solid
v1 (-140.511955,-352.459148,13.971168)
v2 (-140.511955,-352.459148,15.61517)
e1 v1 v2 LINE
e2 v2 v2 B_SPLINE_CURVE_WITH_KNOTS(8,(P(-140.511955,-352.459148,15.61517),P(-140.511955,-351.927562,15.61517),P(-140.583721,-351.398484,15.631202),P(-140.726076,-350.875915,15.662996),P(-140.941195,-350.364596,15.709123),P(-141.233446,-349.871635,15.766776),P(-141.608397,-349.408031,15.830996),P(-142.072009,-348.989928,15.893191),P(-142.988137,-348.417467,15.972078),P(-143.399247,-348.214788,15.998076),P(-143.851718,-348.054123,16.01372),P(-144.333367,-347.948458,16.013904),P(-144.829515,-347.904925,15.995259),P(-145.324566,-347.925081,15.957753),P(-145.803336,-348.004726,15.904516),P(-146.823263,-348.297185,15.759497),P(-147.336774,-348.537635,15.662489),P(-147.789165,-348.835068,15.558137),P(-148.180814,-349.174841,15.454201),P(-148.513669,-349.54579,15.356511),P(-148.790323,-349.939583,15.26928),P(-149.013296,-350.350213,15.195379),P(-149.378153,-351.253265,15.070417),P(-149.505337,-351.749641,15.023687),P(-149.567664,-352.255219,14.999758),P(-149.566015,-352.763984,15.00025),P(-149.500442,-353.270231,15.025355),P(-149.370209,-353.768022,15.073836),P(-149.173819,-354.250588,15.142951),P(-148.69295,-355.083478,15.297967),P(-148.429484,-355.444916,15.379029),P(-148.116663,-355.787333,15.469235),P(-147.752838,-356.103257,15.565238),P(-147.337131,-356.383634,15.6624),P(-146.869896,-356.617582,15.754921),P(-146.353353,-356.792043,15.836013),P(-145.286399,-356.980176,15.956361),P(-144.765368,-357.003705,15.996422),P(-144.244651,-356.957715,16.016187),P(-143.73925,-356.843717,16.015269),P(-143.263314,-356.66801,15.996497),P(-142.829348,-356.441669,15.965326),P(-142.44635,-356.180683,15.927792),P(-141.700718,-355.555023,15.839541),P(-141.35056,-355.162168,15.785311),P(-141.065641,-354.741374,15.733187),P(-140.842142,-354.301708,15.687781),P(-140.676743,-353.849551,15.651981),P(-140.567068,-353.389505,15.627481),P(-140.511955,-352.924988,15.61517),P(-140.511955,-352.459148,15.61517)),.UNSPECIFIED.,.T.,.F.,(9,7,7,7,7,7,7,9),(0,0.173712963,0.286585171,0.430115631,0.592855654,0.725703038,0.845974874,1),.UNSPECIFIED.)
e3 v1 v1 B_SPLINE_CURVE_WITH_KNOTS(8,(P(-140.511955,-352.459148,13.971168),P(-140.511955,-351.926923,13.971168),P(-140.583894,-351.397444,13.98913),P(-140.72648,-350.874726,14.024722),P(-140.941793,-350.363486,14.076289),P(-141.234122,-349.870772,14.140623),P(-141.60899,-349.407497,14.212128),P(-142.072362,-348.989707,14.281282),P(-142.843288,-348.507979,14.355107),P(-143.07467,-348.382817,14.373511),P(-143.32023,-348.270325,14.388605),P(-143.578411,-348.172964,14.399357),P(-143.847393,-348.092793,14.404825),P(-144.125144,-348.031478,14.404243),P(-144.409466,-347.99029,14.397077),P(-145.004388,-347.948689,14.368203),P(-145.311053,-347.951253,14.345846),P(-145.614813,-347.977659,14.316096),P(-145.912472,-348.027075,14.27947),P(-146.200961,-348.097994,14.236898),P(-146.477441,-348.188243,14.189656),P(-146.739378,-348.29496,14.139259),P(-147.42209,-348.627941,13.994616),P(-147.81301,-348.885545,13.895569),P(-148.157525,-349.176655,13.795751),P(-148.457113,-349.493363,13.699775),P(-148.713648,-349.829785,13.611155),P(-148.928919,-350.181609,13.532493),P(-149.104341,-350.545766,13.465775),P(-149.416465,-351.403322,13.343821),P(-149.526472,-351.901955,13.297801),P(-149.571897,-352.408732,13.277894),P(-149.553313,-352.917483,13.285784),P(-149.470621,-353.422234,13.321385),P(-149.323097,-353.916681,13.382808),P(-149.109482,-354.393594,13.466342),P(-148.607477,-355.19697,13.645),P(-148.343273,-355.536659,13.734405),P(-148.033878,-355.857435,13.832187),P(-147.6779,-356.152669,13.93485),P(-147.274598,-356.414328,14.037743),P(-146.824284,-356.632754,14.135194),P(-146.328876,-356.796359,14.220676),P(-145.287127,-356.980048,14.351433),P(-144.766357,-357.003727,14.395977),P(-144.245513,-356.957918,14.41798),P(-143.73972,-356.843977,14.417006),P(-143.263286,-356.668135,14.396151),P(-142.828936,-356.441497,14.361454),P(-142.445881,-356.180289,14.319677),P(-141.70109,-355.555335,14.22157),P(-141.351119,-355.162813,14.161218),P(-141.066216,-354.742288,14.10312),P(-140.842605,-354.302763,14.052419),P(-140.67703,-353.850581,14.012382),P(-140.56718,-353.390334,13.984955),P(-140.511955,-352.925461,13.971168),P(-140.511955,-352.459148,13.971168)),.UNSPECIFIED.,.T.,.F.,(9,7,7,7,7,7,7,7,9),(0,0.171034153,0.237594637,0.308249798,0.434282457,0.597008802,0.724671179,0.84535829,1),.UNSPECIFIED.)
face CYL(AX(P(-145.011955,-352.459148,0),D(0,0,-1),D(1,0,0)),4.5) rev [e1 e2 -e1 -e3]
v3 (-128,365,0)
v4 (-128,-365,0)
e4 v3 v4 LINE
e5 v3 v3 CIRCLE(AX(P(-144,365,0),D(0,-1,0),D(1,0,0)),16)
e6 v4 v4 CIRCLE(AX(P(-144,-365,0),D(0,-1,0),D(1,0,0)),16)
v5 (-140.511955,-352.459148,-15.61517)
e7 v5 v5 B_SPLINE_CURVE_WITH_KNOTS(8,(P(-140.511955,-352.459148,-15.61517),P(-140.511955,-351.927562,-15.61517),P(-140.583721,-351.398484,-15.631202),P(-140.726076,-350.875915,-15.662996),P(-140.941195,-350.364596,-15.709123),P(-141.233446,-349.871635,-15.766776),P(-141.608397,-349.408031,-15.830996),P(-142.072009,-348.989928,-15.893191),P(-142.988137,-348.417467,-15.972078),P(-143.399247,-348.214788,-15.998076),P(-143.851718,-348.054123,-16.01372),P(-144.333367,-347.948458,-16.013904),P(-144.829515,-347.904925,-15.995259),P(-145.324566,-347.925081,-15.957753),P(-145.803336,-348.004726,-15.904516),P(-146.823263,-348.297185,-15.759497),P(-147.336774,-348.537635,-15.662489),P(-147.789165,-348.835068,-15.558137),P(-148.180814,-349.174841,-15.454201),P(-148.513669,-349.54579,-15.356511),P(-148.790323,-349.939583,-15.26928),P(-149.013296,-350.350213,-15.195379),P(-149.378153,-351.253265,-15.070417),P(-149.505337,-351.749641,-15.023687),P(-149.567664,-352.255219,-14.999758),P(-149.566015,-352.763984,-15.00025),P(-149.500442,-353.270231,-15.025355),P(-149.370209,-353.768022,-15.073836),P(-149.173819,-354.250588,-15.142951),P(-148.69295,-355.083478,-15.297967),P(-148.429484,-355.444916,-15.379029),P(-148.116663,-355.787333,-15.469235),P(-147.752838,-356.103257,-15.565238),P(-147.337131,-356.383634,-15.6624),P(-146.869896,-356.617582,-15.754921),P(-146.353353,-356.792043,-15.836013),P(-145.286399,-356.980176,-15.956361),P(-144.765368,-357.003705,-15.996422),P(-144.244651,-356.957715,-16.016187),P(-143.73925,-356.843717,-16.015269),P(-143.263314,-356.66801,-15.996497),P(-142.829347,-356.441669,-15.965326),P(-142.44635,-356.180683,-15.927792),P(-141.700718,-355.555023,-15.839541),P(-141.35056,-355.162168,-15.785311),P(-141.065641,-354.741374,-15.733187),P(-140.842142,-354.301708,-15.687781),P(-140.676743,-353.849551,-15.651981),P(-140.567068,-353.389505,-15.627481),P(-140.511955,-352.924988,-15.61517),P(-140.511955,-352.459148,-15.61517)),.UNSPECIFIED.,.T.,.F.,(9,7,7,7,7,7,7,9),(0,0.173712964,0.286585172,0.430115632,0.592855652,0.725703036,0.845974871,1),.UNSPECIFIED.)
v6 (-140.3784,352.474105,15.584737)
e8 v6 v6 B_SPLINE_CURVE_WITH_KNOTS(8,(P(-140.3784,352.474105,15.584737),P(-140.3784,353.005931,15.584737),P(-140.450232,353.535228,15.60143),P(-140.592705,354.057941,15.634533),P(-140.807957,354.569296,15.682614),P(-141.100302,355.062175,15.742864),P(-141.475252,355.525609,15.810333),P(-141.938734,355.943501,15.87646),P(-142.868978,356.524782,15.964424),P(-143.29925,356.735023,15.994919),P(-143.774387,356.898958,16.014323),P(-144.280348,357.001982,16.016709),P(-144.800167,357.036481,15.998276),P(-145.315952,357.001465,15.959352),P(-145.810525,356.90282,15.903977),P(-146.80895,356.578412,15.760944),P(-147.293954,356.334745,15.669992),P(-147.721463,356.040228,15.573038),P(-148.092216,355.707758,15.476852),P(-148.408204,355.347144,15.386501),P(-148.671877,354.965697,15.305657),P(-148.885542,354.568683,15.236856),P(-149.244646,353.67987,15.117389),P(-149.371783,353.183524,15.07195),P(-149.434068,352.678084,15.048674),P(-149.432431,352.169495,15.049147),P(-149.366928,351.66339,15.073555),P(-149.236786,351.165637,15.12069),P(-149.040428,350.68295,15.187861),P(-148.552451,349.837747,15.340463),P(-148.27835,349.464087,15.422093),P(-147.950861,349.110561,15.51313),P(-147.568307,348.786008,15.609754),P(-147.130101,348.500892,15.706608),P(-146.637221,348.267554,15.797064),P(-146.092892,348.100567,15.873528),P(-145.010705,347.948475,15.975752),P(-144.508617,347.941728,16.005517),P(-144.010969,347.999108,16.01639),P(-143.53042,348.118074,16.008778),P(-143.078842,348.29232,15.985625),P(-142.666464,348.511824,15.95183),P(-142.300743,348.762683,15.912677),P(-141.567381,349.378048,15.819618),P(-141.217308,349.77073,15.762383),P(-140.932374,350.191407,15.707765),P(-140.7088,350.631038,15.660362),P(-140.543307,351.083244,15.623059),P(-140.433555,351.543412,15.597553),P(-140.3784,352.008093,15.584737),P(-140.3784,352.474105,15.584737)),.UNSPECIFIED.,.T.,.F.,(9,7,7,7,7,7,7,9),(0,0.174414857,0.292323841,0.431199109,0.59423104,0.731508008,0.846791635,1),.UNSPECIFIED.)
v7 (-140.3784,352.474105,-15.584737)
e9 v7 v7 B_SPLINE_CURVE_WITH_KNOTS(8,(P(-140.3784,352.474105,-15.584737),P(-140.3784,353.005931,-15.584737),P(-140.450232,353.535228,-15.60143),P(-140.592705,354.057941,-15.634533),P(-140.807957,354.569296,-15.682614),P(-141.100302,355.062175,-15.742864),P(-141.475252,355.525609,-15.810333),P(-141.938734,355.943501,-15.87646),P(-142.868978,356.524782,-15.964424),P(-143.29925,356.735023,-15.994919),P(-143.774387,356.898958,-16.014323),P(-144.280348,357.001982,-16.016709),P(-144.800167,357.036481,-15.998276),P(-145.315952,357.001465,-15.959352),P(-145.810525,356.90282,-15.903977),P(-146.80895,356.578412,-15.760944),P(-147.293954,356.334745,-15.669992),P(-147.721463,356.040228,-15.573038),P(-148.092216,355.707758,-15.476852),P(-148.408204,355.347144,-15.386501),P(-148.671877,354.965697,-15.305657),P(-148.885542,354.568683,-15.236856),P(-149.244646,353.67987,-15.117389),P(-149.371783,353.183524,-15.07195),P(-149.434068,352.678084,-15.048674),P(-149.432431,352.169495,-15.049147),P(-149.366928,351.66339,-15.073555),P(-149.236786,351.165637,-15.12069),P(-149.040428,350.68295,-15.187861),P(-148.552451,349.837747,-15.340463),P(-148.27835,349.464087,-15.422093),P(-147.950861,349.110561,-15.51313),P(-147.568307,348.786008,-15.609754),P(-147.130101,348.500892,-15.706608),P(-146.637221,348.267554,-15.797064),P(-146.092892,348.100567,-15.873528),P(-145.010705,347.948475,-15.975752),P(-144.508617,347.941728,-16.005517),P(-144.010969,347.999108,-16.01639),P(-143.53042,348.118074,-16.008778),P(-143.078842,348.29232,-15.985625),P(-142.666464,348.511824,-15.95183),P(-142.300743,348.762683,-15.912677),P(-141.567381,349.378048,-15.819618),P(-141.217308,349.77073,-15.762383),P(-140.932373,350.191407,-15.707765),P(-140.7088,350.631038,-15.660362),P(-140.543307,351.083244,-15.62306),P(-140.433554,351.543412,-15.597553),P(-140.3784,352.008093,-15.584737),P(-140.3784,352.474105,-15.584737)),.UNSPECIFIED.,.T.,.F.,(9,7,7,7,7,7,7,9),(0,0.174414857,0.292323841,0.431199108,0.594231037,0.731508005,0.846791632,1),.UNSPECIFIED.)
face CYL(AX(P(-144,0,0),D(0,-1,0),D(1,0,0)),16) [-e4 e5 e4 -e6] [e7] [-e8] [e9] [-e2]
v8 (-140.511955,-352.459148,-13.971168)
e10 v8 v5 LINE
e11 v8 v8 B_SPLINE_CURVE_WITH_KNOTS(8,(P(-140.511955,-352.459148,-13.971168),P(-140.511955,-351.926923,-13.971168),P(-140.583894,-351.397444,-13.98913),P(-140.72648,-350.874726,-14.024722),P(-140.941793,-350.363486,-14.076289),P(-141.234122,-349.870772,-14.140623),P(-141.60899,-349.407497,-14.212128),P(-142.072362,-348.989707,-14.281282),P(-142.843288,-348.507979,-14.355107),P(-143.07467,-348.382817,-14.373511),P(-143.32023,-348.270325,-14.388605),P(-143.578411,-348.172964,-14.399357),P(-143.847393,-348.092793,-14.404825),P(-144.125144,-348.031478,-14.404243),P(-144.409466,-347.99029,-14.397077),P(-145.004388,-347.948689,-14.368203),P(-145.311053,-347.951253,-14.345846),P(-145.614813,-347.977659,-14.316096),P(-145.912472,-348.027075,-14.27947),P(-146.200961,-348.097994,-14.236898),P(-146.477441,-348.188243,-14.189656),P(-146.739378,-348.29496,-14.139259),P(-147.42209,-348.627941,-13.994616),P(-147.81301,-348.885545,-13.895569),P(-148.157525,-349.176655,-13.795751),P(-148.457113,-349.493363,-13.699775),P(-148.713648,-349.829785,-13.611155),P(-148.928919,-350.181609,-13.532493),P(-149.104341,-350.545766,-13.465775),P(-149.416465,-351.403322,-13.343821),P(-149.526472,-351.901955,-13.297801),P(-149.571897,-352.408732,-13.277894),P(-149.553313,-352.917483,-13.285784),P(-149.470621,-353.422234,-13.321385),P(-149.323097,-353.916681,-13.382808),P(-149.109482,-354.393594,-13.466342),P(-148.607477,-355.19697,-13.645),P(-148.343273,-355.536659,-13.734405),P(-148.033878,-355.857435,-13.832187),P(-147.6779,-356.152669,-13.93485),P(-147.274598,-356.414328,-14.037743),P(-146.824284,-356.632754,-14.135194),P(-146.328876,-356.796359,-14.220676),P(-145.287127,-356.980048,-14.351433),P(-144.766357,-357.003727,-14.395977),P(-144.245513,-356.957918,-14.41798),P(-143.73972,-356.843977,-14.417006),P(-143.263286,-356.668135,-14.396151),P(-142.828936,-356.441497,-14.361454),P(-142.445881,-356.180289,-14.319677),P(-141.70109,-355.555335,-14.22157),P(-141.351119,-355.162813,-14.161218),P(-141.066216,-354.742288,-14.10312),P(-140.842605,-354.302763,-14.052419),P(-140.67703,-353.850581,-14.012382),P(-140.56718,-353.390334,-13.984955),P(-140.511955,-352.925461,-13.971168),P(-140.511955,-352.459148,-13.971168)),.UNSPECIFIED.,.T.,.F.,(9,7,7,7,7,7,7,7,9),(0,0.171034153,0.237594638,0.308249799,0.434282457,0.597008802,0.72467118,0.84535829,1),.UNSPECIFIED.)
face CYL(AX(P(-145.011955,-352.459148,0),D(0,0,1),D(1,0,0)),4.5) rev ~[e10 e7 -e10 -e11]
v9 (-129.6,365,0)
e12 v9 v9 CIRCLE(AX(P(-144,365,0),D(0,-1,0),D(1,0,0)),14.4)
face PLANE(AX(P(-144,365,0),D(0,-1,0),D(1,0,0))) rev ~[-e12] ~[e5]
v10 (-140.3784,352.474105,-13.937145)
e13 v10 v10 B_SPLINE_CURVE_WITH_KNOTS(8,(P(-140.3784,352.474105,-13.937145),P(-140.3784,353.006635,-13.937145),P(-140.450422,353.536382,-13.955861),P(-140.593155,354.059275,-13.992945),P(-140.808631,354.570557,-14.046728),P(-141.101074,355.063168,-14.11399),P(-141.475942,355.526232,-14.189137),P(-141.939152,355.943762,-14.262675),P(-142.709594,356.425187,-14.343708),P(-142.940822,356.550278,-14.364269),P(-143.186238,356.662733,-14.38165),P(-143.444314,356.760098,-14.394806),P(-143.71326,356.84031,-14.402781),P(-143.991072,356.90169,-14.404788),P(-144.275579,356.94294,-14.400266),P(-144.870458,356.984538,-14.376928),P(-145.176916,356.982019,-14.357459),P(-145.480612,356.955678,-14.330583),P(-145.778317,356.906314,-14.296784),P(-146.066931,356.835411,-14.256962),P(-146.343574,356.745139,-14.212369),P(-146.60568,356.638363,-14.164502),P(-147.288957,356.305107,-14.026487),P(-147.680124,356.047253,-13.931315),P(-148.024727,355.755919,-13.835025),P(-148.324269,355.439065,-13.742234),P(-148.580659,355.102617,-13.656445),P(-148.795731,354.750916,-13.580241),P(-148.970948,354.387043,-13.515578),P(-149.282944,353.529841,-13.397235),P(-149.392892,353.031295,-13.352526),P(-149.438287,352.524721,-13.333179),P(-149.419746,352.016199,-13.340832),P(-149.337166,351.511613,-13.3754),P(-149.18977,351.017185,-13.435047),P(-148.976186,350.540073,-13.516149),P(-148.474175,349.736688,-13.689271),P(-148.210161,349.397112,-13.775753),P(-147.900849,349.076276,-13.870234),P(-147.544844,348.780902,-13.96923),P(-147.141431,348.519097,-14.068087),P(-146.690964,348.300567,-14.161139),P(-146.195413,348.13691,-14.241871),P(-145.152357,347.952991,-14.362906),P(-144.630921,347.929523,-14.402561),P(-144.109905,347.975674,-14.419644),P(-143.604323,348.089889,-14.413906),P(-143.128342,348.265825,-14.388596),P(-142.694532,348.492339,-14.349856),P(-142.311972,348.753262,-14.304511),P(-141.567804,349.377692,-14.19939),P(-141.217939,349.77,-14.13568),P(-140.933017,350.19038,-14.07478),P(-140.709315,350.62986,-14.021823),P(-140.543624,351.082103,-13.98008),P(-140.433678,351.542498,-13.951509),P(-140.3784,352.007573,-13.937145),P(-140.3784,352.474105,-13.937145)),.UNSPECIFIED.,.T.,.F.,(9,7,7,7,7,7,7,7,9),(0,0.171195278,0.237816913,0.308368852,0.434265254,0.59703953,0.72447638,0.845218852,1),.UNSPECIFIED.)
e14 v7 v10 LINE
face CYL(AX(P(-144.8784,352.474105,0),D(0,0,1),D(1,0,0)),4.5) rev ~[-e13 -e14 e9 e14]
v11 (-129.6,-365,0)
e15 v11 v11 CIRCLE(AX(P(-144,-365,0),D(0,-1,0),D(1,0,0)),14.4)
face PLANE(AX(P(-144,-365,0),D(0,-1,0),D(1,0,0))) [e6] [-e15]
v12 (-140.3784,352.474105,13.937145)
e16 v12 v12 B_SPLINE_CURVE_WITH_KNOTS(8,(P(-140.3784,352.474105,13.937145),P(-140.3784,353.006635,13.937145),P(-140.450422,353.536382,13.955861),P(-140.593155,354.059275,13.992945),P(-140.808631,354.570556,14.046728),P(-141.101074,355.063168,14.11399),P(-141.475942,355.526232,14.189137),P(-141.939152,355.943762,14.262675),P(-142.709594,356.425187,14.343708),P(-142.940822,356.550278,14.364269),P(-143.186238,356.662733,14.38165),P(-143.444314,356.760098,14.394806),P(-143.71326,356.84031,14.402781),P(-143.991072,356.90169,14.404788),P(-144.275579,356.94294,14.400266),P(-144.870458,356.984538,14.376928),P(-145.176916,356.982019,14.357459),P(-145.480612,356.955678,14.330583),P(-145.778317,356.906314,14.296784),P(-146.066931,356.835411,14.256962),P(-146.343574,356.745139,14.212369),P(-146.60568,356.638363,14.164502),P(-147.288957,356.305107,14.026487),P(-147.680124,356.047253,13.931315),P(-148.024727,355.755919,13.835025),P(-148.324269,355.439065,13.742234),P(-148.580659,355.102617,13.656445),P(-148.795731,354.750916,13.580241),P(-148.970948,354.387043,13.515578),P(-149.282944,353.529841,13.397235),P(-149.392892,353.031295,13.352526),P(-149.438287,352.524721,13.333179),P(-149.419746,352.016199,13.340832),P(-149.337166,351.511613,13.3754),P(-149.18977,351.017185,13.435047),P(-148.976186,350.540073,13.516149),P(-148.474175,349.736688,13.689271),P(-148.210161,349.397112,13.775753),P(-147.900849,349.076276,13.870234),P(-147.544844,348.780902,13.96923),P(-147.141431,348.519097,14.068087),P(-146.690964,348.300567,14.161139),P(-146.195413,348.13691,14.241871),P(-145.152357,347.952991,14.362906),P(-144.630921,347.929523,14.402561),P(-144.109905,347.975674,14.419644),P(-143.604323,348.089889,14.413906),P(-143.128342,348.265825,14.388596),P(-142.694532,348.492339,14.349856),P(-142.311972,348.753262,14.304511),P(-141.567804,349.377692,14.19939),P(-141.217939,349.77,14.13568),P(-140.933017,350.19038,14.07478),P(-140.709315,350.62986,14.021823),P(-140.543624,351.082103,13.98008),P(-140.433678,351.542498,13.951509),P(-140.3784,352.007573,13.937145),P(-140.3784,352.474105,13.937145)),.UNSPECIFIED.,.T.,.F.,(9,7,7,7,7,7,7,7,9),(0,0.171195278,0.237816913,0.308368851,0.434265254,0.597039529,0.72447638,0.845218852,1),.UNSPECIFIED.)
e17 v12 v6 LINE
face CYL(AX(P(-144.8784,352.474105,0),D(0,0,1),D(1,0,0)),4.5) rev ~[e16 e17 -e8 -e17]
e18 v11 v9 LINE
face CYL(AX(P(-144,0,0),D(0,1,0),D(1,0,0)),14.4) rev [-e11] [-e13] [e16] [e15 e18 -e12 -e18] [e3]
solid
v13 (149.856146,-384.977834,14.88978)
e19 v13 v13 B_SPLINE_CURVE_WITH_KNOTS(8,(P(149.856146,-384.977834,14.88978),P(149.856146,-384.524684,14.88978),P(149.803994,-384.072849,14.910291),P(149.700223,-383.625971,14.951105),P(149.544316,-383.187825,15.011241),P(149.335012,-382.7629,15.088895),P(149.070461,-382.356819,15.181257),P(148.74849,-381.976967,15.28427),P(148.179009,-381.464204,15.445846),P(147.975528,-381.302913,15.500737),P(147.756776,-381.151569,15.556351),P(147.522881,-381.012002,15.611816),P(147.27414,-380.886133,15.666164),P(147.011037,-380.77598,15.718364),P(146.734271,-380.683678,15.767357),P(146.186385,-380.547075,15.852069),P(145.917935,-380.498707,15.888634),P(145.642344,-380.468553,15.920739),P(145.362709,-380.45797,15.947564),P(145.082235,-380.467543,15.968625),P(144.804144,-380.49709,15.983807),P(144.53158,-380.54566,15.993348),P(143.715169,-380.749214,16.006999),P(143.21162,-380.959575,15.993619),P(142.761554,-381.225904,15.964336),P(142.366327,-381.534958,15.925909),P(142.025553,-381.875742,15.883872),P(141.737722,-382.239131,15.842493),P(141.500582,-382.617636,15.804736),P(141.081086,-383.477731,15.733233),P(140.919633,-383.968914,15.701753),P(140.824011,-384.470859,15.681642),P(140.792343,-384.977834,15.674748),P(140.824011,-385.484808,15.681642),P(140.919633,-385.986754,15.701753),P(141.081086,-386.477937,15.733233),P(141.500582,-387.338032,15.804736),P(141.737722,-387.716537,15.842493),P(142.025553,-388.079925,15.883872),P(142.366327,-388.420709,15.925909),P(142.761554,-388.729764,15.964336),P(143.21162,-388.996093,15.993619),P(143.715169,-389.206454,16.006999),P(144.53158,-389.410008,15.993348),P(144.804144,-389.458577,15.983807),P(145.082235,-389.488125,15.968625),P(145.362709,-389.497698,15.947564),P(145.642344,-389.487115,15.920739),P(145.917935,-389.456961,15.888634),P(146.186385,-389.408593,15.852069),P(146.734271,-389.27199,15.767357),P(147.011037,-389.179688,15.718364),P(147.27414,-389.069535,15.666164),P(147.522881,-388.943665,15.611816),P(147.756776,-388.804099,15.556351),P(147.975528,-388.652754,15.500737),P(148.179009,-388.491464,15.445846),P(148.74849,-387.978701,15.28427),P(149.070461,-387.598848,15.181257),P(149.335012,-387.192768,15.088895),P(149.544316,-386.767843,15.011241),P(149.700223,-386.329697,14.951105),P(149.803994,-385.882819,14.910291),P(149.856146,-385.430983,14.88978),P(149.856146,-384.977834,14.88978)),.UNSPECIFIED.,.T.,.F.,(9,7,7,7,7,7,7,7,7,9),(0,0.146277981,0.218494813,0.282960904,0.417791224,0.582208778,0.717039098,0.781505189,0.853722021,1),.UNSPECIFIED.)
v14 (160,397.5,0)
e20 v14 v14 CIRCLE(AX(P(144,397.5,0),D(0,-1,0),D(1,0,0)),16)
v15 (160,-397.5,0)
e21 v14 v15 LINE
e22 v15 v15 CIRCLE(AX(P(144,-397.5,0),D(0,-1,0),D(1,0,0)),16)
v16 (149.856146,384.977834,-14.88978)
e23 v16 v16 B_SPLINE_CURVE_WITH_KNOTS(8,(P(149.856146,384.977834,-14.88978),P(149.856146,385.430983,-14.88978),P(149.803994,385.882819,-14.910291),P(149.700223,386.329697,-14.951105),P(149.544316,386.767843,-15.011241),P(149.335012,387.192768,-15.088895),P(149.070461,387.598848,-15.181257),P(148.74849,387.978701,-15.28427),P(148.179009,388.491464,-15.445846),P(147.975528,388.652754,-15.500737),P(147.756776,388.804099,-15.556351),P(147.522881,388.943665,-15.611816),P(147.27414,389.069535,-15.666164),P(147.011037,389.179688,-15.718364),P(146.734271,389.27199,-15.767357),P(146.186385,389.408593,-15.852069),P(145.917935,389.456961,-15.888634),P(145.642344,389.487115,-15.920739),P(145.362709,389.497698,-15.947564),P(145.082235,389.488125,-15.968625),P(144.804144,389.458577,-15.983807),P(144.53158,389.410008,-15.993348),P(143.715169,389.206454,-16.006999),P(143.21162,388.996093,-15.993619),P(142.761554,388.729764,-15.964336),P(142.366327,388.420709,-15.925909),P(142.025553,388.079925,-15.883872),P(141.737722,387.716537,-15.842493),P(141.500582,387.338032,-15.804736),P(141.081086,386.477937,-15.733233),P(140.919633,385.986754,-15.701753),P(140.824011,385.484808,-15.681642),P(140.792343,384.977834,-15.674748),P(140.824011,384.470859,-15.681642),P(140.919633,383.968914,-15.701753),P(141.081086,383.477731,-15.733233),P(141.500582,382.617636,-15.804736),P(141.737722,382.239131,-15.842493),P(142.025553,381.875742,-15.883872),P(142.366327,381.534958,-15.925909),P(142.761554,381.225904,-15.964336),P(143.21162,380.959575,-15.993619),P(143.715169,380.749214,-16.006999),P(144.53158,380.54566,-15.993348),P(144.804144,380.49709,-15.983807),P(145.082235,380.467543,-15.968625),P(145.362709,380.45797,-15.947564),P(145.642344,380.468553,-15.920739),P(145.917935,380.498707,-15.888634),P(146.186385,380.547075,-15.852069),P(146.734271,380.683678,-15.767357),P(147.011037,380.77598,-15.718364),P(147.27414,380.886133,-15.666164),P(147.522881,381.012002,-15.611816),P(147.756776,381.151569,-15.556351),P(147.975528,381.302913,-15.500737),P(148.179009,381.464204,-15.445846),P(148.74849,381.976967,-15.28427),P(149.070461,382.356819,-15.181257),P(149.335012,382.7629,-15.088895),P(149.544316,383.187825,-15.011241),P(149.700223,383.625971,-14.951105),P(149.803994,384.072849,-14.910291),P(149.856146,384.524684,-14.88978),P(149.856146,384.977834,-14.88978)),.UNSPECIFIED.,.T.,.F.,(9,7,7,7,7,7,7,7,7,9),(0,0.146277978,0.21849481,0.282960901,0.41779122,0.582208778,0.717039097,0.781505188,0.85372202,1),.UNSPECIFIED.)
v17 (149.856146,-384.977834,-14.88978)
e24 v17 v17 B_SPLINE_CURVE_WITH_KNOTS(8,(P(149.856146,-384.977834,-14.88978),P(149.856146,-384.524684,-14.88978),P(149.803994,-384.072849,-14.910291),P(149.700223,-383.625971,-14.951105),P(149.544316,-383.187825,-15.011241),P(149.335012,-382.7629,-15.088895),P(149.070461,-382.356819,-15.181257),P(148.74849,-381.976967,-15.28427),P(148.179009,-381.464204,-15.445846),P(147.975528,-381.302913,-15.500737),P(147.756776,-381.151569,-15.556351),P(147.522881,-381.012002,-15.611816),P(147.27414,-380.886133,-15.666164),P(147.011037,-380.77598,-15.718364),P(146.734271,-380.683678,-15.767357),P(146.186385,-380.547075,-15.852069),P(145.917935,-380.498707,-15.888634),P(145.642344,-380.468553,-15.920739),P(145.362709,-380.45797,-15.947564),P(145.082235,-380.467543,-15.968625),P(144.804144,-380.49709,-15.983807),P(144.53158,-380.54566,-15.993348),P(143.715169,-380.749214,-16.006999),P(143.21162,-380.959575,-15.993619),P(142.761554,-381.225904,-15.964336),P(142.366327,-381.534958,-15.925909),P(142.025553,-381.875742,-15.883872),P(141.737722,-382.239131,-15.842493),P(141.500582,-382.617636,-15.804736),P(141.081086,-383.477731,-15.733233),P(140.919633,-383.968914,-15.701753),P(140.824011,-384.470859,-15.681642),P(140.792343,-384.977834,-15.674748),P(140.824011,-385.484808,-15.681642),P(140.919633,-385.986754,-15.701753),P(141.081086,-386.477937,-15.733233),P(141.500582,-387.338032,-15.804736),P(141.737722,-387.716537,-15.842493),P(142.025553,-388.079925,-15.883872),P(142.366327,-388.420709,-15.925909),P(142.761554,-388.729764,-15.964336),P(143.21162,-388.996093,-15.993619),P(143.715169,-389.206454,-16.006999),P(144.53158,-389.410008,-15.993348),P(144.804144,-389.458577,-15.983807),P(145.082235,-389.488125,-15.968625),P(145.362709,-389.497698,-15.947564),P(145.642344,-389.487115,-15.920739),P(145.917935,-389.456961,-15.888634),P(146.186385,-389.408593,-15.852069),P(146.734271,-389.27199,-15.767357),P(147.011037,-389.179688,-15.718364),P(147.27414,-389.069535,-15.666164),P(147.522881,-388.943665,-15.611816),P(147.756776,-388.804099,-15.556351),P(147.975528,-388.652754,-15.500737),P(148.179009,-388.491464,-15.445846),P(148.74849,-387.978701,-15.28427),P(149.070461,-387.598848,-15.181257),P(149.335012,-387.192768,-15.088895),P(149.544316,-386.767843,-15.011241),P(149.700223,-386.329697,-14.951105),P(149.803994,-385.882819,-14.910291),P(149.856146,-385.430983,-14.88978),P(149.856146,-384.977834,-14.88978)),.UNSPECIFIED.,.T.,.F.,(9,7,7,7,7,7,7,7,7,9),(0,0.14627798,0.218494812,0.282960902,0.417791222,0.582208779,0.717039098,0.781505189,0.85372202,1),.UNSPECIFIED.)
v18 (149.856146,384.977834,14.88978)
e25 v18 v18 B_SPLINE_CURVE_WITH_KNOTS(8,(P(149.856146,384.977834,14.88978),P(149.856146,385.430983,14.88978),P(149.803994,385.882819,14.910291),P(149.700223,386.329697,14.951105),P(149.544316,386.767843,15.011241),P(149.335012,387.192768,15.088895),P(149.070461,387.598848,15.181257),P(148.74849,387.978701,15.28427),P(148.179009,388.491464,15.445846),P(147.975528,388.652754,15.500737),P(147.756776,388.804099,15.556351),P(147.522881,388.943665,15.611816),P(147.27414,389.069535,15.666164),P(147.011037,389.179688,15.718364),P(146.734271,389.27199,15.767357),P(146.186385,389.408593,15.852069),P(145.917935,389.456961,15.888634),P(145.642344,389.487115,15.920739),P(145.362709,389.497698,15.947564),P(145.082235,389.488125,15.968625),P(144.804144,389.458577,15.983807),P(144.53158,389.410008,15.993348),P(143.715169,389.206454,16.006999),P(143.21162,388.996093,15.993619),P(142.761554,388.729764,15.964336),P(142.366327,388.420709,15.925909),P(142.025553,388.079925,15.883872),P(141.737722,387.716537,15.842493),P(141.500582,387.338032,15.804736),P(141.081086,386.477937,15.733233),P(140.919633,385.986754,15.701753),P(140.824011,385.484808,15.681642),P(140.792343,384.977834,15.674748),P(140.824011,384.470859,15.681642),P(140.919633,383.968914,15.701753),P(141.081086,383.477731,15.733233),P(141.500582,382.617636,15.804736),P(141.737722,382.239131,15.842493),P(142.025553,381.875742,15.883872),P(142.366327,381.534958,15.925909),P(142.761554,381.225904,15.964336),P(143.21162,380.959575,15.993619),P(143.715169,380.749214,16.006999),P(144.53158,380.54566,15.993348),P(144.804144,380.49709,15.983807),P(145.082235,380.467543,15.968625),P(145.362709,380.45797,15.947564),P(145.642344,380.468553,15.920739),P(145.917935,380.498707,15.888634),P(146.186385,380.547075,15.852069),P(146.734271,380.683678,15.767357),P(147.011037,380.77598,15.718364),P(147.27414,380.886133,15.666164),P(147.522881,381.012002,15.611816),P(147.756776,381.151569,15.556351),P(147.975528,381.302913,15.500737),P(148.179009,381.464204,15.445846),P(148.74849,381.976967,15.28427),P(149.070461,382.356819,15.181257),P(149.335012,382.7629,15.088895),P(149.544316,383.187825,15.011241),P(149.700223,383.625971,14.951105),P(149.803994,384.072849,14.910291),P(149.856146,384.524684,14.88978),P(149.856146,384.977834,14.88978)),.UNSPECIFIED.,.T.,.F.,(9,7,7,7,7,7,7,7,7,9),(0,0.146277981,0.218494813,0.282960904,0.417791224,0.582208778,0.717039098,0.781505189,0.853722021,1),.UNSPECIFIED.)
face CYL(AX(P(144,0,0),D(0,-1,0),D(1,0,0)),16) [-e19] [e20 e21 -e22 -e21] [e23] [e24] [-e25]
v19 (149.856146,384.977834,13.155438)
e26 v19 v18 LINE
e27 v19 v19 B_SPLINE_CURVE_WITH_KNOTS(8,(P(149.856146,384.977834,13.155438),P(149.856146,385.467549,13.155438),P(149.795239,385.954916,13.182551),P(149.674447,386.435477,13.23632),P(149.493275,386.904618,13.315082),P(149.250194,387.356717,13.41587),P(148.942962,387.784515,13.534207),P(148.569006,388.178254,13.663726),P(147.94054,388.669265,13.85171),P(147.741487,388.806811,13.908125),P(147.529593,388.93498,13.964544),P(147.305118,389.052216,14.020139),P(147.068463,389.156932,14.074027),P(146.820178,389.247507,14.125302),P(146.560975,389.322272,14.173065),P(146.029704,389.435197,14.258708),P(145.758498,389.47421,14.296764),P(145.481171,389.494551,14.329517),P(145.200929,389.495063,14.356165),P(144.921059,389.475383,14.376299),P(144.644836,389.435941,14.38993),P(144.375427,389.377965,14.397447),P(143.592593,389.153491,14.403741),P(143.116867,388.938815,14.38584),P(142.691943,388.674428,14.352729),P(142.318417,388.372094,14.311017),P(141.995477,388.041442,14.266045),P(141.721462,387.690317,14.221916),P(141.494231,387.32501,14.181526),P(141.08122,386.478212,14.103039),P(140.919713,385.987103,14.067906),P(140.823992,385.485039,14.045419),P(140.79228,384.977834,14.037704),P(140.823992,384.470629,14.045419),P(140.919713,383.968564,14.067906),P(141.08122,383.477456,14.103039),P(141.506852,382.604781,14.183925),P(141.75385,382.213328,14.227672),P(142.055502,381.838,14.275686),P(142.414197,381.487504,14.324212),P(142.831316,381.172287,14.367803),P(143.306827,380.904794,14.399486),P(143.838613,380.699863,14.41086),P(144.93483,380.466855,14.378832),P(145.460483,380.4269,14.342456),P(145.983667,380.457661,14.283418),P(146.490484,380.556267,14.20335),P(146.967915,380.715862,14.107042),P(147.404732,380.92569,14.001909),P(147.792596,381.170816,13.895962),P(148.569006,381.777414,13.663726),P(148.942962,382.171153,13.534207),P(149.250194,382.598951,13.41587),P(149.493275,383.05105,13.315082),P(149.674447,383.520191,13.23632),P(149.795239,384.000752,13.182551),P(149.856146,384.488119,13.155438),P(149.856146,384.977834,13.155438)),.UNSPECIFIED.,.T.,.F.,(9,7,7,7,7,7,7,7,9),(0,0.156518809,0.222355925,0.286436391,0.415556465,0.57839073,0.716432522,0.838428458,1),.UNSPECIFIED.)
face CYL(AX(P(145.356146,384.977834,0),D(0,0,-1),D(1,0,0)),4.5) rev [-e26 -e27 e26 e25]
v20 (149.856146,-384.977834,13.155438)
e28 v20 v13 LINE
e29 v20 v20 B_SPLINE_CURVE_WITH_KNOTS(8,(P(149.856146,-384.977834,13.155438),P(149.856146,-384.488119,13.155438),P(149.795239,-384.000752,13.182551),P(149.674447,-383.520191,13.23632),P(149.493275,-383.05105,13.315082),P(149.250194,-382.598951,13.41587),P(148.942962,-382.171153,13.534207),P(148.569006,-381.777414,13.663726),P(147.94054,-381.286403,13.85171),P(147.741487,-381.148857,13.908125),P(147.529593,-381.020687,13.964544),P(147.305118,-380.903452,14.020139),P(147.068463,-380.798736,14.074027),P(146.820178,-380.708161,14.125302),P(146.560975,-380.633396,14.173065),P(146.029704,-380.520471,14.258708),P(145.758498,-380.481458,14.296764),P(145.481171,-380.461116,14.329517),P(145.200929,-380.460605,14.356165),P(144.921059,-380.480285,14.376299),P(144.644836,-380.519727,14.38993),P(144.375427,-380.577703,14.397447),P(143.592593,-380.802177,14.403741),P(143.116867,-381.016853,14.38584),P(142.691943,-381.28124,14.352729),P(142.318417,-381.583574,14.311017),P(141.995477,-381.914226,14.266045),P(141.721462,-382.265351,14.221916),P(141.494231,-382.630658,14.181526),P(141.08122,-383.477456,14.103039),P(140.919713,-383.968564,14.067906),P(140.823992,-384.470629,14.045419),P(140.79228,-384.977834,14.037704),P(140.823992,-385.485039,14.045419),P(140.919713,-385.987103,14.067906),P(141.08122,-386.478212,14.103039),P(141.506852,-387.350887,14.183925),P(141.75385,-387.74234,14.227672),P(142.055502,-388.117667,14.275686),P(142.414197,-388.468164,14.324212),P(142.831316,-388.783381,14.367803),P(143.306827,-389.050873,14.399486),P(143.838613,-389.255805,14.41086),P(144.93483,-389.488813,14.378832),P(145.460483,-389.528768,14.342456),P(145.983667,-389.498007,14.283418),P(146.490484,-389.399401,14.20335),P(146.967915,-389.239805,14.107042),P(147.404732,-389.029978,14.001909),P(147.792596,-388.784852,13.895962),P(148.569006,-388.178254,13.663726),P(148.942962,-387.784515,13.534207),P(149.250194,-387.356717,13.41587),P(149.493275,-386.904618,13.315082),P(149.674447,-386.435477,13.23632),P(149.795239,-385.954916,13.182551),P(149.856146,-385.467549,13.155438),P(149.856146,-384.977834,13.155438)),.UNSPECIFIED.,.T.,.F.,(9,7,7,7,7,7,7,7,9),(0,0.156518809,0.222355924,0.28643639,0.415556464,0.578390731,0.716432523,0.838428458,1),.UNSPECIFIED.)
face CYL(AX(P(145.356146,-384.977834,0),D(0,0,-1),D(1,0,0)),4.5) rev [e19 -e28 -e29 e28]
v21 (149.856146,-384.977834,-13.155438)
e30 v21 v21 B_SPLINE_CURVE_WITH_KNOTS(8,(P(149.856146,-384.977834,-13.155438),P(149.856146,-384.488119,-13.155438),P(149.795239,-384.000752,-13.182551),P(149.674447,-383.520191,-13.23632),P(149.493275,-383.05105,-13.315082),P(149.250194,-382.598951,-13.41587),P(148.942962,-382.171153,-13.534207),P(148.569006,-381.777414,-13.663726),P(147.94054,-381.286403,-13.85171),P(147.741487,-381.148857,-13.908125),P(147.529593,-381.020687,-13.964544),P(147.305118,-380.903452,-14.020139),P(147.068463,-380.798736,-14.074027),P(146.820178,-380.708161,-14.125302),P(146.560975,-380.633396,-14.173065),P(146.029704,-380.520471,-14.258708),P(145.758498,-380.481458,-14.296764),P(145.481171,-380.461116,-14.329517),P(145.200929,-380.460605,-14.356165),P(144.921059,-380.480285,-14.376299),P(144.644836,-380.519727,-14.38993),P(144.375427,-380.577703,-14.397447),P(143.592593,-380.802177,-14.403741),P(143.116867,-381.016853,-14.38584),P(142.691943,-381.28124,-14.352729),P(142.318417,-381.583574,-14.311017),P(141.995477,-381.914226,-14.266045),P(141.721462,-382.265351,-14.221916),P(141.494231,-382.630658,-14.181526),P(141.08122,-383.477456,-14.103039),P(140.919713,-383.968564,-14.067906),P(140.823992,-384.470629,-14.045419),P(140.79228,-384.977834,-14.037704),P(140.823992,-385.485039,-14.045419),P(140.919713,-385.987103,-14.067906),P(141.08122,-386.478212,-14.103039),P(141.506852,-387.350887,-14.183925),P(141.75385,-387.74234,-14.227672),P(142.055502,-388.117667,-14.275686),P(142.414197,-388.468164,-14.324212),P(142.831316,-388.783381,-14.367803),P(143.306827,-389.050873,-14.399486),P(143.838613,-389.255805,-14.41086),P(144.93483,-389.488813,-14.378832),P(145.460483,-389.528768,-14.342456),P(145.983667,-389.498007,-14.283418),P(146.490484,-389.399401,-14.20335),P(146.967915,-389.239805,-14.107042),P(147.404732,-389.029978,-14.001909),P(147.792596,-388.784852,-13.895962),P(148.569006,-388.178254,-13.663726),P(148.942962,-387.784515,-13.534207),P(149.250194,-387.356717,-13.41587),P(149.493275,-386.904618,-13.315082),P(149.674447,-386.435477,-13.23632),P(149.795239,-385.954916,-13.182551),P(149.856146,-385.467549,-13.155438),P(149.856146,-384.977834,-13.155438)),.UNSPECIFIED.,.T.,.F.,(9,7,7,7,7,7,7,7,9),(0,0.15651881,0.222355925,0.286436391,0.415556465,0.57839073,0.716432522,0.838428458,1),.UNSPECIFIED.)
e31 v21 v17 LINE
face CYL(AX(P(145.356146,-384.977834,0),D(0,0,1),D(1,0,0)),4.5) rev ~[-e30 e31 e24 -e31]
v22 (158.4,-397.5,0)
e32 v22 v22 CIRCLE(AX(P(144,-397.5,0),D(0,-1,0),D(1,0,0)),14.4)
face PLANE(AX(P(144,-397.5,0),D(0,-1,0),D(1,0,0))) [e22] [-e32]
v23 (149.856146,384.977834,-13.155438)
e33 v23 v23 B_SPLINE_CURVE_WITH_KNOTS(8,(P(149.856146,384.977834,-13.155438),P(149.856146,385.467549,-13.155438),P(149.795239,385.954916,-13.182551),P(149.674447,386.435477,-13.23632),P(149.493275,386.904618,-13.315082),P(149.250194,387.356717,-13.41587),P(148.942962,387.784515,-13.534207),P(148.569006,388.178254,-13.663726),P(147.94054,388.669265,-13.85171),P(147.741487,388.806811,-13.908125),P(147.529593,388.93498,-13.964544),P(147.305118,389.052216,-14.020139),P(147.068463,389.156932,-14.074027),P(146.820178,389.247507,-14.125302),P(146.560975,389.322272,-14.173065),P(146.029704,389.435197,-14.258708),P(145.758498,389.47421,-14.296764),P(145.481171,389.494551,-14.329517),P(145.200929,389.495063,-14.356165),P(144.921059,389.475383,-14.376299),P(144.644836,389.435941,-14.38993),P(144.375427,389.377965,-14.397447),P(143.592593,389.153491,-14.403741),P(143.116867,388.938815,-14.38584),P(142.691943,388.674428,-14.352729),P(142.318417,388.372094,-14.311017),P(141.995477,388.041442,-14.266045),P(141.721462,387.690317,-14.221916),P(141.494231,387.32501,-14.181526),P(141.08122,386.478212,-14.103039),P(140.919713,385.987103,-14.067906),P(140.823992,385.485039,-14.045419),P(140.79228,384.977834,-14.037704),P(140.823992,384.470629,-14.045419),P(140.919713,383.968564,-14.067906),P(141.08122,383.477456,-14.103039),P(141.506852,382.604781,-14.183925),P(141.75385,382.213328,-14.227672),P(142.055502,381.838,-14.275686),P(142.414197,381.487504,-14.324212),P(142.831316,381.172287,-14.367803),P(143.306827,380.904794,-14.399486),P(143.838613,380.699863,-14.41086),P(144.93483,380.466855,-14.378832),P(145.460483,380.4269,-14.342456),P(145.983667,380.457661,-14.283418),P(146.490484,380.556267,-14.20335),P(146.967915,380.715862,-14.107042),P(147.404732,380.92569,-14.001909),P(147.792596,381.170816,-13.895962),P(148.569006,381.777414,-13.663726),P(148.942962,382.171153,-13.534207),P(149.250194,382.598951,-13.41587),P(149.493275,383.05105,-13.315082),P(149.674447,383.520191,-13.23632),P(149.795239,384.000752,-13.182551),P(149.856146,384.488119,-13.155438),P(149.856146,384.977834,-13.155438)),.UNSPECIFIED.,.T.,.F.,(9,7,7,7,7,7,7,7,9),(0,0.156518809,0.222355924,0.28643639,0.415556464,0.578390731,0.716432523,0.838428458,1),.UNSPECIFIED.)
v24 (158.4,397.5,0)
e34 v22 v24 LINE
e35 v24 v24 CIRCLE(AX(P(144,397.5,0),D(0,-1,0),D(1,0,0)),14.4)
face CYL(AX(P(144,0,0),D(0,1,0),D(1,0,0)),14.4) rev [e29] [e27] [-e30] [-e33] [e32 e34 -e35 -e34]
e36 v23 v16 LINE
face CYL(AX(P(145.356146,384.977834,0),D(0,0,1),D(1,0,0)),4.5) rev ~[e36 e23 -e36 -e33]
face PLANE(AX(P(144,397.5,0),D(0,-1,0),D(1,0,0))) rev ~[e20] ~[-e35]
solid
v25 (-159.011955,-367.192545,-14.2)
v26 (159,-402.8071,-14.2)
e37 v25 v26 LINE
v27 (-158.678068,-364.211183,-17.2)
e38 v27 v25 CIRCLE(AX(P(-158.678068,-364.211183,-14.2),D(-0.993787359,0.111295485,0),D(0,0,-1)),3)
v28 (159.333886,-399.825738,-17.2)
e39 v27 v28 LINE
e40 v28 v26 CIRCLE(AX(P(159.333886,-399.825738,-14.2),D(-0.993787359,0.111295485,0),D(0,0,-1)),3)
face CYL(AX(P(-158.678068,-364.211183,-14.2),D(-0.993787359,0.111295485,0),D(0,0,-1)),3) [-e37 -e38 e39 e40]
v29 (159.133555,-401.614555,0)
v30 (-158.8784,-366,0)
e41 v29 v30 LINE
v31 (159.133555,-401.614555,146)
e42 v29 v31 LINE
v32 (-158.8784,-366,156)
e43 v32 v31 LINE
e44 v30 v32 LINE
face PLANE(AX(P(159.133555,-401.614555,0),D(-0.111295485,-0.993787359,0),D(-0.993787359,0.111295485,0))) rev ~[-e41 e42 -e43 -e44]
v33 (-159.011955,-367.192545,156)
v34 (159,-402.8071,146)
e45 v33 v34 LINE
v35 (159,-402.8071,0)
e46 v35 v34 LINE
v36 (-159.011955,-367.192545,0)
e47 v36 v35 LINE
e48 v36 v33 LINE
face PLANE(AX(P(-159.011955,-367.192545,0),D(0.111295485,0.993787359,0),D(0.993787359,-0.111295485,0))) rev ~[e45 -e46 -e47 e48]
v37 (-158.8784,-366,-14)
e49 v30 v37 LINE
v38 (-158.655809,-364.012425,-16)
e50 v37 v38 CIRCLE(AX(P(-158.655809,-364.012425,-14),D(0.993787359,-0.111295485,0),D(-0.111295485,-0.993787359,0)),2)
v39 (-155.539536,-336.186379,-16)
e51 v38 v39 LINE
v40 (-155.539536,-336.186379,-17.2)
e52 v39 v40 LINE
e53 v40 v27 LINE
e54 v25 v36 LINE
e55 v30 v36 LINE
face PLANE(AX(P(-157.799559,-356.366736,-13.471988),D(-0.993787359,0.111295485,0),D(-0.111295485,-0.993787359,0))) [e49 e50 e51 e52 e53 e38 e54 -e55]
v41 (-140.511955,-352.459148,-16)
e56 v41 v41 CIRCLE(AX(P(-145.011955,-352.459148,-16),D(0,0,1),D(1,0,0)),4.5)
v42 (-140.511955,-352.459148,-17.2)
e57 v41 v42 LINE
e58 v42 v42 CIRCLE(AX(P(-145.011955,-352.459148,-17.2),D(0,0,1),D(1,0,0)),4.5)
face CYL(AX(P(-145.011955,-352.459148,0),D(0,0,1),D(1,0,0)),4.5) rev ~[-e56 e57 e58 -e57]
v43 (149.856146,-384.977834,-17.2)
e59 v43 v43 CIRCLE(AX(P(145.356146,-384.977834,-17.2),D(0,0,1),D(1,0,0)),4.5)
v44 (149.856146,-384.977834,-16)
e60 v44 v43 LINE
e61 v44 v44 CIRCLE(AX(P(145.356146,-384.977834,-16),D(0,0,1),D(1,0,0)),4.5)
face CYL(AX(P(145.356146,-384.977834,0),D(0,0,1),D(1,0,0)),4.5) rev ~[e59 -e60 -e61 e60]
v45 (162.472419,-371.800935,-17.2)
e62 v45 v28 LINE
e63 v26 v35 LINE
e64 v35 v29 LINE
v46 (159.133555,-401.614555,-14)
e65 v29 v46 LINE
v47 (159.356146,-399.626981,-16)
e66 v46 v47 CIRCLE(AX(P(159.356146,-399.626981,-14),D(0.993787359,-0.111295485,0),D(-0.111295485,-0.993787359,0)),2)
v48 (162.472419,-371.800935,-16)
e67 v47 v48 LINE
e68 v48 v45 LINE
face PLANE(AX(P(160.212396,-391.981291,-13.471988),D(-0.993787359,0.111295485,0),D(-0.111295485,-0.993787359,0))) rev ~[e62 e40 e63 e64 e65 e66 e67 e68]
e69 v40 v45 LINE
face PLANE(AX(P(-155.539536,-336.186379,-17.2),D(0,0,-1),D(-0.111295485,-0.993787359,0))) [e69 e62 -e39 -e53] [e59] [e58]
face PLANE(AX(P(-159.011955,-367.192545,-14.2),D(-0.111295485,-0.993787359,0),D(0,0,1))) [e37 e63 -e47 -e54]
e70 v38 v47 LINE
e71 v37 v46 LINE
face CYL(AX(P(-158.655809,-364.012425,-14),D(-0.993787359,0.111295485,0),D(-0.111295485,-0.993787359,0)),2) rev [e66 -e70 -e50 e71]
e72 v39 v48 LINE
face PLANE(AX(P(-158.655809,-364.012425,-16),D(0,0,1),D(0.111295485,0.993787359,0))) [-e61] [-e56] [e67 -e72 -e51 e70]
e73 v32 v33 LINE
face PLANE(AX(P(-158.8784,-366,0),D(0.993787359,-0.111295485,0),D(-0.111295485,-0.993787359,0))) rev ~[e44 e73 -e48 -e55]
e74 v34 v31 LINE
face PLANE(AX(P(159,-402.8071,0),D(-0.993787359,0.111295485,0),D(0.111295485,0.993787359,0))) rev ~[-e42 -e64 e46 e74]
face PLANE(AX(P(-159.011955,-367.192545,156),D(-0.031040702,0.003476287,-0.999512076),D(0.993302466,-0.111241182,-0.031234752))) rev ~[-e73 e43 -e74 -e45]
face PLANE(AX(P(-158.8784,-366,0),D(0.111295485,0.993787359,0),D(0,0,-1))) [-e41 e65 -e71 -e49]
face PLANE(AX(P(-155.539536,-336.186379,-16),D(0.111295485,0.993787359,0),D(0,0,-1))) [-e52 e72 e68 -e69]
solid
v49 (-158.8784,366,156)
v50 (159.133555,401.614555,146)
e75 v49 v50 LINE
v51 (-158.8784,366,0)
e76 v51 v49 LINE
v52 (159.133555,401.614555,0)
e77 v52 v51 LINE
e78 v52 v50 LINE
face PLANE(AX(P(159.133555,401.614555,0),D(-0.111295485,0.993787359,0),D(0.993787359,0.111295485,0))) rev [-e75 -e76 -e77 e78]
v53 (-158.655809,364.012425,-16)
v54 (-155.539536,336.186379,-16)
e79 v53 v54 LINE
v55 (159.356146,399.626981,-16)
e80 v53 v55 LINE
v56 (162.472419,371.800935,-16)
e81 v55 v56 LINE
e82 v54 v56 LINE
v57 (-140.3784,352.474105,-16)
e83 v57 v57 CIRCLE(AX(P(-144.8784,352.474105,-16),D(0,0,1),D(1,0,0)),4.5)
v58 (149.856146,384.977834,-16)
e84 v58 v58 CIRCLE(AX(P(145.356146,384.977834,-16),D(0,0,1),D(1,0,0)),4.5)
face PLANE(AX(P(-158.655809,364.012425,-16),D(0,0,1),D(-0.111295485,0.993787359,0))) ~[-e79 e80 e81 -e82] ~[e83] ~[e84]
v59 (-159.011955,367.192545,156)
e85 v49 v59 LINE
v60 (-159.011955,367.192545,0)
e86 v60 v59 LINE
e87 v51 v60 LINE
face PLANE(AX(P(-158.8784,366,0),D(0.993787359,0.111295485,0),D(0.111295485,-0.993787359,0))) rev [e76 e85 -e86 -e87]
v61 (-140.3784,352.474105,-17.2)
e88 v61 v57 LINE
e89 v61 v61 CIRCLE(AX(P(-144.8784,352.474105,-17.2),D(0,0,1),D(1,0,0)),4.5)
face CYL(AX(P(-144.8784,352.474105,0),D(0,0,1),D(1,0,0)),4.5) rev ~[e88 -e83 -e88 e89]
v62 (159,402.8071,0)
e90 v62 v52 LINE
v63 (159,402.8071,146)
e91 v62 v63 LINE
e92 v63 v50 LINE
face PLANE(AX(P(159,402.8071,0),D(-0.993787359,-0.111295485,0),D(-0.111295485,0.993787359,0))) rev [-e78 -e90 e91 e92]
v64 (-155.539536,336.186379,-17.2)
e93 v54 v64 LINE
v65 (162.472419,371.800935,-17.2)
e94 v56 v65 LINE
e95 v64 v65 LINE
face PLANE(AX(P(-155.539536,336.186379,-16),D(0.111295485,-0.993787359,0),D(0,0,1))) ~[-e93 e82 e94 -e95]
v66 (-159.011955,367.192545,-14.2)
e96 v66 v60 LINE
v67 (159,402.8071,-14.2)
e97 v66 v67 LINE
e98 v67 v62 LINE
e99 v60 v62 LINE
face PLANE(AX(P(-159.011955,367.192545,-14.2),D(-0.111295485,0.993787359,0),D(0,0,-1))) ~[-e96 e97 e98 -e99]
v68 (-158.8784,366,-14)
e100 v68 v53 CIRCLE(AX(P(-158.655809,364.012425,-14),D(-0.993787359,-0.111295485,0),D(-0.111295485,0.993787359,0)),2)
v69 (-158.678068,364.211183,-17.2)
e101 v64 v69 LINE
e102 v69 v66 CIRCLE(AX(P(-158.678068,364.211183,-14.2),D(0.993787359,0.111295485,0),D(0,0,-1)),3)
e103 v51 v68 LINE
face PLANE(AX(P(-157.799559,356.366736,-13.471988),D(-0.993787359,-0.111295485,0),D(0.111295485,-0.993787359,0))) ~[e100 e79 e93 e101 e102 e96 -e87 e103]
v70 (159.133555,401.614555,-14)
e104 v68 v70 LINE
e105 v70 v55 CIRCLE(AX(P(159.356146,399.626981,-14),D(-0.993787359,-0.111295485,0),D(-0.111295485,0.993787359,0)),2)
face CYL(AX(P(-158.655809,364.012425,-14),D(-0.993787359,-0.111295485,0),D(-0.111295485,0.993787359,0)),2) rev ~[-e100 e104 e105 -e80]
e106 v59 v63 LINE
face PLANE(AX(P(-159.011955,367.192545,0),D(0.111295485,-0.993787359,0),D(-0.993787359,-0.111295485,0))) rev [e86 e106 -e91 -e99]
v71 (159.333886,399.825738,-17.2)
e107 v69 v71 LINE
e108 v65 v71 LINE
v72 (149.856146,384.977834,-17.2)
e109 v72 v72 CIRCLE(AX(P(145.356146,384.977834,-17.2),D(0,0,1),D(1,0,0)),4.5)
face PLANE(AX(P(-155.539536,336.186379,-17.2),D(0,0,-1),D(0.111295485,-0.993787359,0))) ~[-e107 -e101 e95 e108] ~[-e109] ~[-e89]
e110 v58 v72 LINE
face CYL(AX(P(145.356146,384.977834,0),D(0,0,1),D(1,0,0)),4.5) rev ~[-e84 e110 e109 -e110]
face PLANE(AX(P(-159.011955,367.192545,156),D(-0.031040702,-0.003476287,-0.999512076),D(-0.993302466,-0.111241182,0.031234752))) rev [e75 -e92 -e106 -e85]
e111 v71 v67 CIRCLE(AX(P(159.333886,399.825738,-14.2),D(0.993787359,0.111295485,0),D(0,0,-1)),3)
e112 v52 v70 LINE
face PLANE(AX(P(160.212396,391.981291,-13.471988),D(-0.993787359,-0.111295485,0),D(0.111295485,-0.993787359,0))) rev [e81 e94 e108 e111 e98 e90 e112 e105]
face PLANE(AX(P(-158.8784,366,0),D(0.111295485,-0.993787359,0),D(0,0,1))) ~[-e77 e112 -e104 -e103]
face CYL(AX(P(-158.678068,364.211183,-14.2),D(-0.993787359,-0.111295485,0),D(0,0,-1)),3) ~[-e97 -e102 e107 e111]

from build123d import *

# Parameters (mm, degrees)
F0_R      = 16
F0_R_2    = 14.4
F1_DEPTH  = 365
F2_R      = 16
F2_R_2    = 14.4
F3_DEPTH  = 397.5
F5_DEPTH  = 156
F7_DEPTH  = 320
F9_DEPTH  = 1.2
F11_R     = 4.5
F12_DEPTH = 18


with BuildPart() as f1:
    # F0 (on Front) → F1 (new body, symmetric)
    with BuildSketch(Plane.XZ):
        with Locations((-144, 0)):
            Circle(F0_R)
        with Locations((-144, 0)):
            Circle(F0_R_2, mode=Mode.SUBTRACT)
    extrude(amount=F1_DEPTH, both=True)


with BuildPart() as f3:
    # F2 (on Front) → F3 (new body, symmetric)
    with BuildSketch(Plane.XZ):
        with Locations((144, 0)):
            Circle(F2_R)
        with Locations((144, 0)):
            Circle(F2_R_2, mode=Mode.SUBTRACT)
    extrude(amount=F3_DEPTH, both=True)


with BuildPart() as f5:
    # F4 (on Top) → F5 (new body)
    with BuildSketch(Plane.XY):
        Polygon((159.1335545823, -401.614555292), (-158.8784003051, -366), (-159.0119548875, -367.1925448308), (159, -402.8071001228), align=None)
    extrude(amount=F5_DEPTH)

    # F6 (on face) → F7 (join)
    with BuildSketch(Plane(origin=(-116.4293426194, 13.0390672319, 0), x_dir=(-0.1112954853, -0.993787359, 0), z_dir=(-0.993787359, 0.1112954853, 0))):
        with BuildLine():
            Line((382.6086220662, 0), (381.4086220662, 0))
            Line((381.4086220662, 0), (381.4086220662, -14))
            ThreePointArc((381.4086220662, -14), (380.8228356286, -15.4142135624), (379.4086220662, -16))
            Line((379.4086220662, -16), (351.4086220662, -16))
            Line((351.4086220662, -16), (351.4086220662, -17.2))
            Line((351.4086220662, -17.2), (379.6086220662, -17.2))
            ThreePointArc((379.6086220662, -17.2), (381.7299424098, -16.3213203436), (382.6086220662, -14.2))
            Line((382.6086220662, -14.2), (382.6086220662, 0))
        make_face()
    extrude(amount=-F7_DEPTH)

    # F8 (on face) → F9 (cut, through all)
    with BuildSketch(Plane(origin=(-42.5826122681, -380.2316120627, 0), x_dir=(0.993787359, -0.1112954853, 0), z_dir=(-0.1112954853, -0.993787359, 0))):
        Polygon((202.8428017702, 156), (-117.1571982298, 156), (202.8428017702, 146), align=None)
    extrude(amount=-F9_DEPTH, mode=Mode.SUBTRACT)


with BuildPart() as f10_1:
    # F10: instance of F5
    add(f5.part.mirror(Plane.XZ))


with BuildPart() as f12_tool:
    # F11 (on Top) → F12 (new body, symmetric)
    with BuildSketch(Plane.XY):
        with Locations((-145.0119548875, -352.459148322)):
            Circle(F11_R)
        with Locations((145.3561455529, -384.977833891)):
            Circle(F11_R)
        with Locations((145.3561455529, 384.977833891)):
            Circle(F11_R)
        with Locations((-144.8784003051, 352.4741052662)):
            Circle(F11_R)
    extrude(amount=F12_DEPTH, both=True)


with BuildPart() as f1_1:
    add(f1.part)

    # F12: cut by f12_tool
    add(f12_tool.part, mode=Mode.SUBTRACT)


with BuildPart() as f3_1:
    add(f3.part)

    # F12: cut by f12_tool
    add(f12_tool.part, mode=Mode.SUBTRACT)


with BuildPart() as f5_1:
    add(f5.part)

    # F12: cut by f12_tool
    add(f12_tool.part, mode=Mode.SUBTRACT)


with BuildPart() as f10_1_1:
    add(f10_1.part)

    # F12: cut by f12_tool
    add(f12_tool.part, mode=Mode.SUBTRACT)


solid = Compound([f1_1.part, f3_1.part, f5_1.part, f10_1_1.part])
